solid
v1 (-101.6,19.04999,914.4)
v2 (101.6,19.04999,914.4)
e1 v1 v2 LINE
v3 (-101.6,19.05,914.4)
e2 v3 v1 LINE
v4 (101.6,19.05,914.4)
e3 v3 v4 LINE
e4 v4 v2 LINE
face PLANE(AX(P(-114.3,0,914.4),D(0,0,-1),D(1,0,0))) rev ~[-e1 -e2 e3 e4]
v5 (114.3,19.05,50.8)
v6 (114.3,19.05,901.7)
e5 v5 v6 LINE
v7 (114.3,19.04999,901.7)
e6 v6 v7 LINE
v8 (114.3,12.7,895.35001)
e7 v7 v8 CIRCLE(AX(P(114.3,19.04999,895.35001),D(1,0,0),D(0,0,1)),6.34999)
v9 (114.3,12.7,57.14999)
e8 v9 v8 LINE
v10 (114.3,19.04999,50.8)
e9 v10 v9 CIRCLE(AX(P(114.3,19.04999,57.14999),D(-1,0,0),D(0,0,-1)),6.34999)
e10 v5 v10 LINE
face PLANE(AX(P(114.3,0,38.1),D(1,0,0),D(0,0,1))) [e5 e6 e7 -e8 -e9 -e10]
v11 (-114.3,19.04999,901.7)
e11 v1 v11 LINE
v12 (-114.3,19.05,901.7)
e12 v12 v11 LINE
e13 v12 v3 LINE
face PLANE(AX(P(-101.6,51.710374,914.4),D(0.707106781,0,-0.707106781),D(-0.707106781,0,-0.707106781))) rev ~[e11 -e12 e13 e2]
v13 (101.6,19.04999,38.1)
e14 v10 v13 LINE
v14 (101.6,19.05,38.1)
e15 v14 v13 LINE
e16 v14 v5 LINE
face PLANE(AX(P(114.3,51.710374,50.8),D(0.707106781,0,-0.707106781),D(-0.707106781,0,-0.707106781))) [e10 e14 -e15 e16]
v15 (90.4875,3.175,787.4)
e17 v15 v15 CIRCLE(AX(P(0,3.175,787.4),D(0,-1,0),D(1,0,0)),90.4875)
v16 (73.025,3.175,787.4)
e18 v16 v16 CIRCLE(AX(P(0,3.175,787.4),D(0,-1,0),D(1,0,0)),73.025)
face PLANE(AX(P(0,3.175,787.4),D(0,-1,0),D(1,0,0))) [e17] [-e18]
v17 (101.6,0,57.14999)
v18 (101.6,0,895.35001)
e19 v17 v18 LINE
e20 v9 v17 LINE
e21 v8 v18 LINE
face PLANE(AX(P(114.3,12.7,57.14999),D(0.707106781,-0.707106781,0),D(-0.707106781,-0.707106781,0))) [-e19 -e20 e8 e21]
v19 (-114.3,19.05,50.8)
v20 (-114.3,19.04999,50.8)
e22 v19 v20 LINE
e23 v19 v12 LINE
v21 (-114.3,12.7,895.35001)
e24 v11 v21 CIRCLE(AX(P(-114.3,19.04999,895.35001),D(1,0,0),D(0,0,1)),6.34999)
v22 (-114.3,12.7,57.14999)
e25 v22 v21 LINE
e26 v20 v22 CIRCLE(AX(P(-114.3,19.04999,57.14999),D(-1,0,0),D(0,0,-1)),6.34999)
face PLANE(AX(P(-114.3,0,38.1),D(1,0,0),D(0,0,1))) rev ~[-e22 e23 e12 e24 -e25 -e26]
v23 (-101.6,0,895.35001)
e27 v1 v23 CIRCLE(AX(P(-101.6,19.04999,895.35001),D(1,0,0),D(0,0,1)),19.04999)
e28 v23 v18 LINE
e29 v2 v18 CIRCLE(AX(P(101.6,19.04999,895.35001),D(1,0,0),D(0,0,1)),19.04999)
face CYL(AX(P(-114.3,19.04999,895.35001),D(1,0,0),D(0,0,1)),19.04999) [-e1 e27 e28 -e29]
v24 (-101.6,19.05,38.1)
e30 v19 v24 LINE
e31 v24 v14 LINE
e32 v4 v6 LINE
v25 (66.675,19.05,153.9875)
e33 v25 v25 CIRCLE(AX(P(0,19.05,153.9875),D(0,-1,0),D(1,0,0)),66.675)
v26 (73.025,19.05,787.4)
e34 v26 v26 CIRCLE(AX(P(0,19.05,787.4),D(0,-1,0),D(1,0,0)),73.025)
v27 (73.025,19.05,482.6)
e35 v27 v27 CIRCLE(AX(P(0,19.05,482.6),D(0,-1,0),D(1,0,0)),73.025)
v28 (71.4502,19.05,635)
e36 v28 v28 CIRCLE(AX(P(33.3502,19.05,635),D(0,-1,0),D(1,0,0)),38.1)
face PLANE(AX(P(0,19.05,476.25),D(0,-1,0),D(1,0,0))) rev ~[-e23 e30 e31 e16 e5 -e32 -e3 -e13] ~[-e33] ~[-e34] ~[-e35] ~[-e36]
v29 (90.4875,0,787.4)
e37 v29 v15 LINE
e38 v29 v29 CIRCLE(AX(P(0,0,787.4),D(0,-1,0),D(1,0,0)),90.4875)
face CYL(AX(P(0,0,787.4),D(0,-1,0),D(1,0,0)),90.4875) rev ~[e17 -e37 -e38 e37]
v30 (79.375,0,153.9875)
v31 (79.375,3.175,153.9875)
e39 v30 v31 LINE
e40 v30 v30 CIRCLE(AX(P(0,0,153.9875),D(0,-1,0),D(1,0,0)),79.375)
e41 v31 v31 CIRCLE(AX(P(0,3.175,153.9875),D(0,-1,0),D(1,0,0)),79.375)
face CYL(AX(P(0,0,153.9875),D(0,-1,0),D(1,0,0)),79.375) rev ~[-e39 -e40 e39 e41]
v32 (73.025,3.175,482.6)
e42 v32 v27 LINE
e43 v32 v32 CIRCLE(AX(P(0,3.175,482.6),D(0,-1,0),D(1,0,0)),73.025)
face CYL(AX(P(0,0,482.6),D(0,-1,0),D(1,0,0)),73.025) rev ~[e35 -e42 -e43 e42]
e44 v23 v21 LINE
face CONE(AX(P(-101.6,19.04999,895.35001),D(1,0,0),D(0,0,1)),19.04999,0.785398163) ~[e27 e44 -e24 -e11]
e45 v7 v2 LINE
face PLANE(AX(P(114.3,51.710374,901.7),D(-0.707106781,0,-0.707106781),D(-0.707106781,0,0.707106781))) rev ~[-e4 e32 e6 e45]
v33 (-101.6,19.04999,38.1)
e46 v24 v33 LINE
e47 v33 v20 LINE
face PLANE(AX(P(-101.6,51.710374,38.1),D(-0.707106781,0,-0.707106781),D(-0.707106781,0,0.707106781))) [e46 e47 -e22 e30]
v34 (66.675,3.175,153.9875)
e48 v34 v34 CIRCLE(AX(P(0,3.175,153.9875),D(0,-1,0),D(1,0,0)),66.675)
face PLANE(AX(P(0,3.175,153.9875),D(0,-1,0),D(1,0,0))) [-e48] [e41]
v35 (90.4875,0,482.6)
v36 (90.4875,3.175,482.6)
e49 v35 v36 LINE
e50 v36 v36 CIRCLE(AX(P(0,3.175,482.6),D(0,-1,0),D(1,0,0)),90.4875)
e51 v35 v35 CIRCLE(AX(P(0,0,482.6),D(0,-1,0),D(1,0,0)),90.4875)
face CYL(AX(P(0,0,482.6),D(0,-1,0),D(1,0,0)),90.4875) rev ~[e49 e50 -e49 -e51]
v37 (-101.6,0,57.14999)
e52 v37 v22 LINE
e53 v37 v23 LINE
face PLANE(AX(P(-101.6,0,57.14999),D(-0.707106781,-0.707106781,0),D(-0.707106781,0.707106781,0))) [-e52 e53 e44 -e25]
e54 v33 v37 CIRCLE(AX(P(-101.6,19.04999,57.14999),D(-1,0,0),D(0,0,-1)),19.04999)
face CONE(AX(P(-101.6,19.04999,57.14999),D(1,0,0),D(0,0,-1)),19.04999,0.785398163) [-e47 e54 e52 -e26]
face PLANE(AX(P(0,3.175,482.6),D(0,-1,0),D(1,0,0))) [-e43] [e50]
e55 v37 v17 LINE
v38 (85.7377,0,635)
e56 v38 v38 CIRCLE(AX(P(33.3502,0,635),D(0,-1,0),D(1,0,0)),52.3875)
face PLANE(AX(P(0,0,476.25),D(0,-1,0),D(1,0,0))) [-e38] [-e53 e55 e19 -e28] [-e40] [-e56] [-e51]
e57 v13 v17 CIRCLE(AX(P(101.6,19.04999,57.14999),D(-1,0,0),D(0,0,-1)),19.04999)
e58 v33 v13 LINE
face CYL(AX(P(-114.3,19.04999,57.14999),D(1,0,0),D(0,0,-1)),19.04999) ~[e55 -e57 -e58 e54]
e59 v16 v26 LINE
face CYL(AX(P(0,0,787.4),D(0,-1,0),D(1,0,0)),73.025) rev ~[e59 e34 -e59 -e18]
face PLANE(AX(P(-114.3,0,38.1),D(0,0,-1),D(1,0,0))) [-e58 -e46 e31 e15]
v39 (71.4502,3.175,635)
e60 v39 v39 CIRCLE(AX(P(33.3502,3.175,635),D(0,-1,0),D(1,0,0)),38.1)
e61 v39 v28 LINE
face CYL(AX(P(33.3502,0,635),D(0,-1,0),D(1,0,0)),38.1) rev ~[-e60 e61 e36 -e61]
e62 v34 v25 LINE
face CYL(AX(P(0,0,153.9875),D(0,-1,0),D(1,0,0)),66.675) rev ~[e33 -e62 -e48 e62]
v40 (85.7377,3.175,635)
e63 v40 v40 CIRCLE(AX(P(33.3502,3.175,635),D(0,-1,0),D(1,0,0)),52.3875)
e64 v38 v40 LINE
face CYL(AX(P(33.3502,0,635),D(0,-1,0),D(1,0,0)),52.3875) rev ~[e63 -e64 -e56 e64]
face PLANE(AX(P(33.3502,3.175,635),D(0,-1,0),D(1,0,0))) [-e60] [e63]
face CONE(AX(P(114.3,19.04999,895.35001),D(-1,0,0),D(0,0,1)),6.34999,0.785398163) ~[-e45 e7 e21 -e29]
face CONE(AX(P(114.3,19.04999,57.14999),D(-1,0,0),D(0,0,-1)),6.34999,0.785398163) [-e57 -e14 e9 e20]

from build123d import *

# Parameters (mm, degrees)
F0_W         = 228.6
F0_H         = 876.3
F0_R         = 79.375
F0_R_2       = 90.4875
F0_R_3       = 52.3875
F0_R_4       = 73.025
F0_R_5       = 38.1
F0_R_6       = 66.675
F1_DEPTH     = 19.05
F2_DEPTH     = 3.175
F4_R         = 19.04999
F5_T1_DEPTH  = 838.20002
F5_T3_DEPTH  = 32.6603839472
F5_T6_ANGLE  = 90
F5_T8_ANGLE  = 90
F5_T10_ANGLE = 90
F5_T12_ANGLE = 90


# Not quite as in the source:
# - a fillet or chamfer that OpenCascade refuses, or shapes differently, is made with other operations: its cross-section is extruded or revolved along the edge and cut away or added
# - a fillet or chamfer is up to 0.001 mm smaller than in the source, because OpenCascade refuses the exact size


with BuildPart() as f1:
    # F0 (on Front) → F1 (new body)
    with BuildSketch(Plane.XZ):
        with Locations((0, 476.25)):
            Rectangle(F0_W, F0_H)
        with Locations((0, 153.9875)):
            Circle(F0_R, mode=Mode.SUBTRACT)
        with Locations((0, 482.6)):
            Circle(F0_R_2, mode=Mode.SUBTRACT)
        with Locations((33.3502, 635)):
            Circle(F0_R_3, mode=Mode.SUBTRACT)
        with Locations((0, 787.4)):
            Circle(F0_R_2, mode=Mode.SUBTRACT)
        with Locations((0, 787.4)):
            Circle(F0_R_2)
        with Locations((0, 787.4)):
            Circle(F0_R_4, mode=Mode.SUBTRACT)
        with Locations((33.3502, 635)):
            Circle(F0_R_3)
        with Locations((33.3502, 635)):
            Circle(F0_R_5, mode=Mode.SUBTRACT)
        with Locations((0, 482.6)):
            Circle(F0_R_2)
        with Locations((0, 482.6)):
            Circle(F0_R_4, mode=Mode.SUBTRACT)
        with Locations((0, 153.9875)):
            Circle(F0_R)
        with Locations((0, 153.9875)):
            Circle(F0_R_6, mode=Mode.SUBTRACT)
    extrude(amount=-F1_DEPTH)

    # F0 (on Front) → F2 (cut)
    with BuildSketch(Plane.XZ):
        with Locations((0, 787.4)):
            Circle(F0_R_2)
        with Locations((0, 787.4)):
            Circle(F0_R_4, mode=Mode.SUBTRACT)
        with Locations((33.3502, 635)):
            Circle(F0_R_3)
        with Locations((33.3502, 635)):
            Circle(F0_R_5, mode=Mode.SUBTRACT)
        with Locations((0, 482.6)):
            Circle(F0_R_2)
        with Locations((0, 482.6)):
            Circle(F0_R_4, mode=Mode.SUBTRACT)
        with Locations((0, 153.9875)):
            Circle(F0_R)
        with Locations((0, 153.9875)):
            Circle(F0_R_6, mode=Mode.SUBTRACT)
    extrude(amount=-F2_DEPTH, mode=Mode.SUBTRACT)

    # F4 (radius 19.05 in the source; OpenCascade refuses exactly that, so slightly less here)
    f4_edges = [f1.edges().sort_by_distance(p)[0] for p in [
        (0, 0, 914.4),
        (0, 0, 38.1),
    ]]
    fillet(f4_edges, radius=F4_R)

    # F5: chamfer of 12.7 on 2 edges, made by hand

    # F5_s2 → F5_t1 (cut)
    with BuildSketch(Plane.XY.offset(57.14999)):
        Polygon((-101.6, 0), (-114.3, 12.7), (-114.3, 0), align=None)
        Polygon((114.3, 12.7), (101.6, 0), (114.3, 0), align=None)
    extrude(amount=F5_T1_DEPTH, mode=Mode.SUBTRACT)

    # F5_s4 → F5_t3 (cut)
    with BuildSketch(Plane.XZ.offset(-51.7103739472)):
        Polygon((114.3, 901.7), (101.6, 914.4), (114.3, 914.4), align=None)
        Polygon((114.3, 50.8), (101.6, 38.1), (114.3, 38.1), align=None)
        Polygon((-101.6, 38.1), (-114.3, 50.8), (-114.3, 38.1), align=None)
        Polygon((-101.6, 914.4), (-114.3, 901.7), (-114.3, 914.4), align=None)
    extrude(amount=F5_T3_DEPTH, mode=Mode.SUBTRACT)

    # F5_s5 → F5_t6 (revolve, cut)
    with BuildSketch(Plane.XZ.offset(-19.04999)):
        Polygon((114.3, 50.8), (101.6, 38.1), (114.3, 38.1), align=None)
    revolve(axis=Axis((114.3, 19.04999, 57.14999), (-1, 0, 0)), revolution_arc=F5_T6_ANGLE, mode=Mode.SUBTRACT)

    # F5_s7 → F5_t8 (revolve, cut)
    with BuildSketch(Plane.XZ.offset(-19.04999)):
        Polygon((114.3, 901.7), (101.6, 914.4), (114.3, 914.4), align=None)
    revolve(axis=Axis((114.3, 19.04999, 895.35001), (1, 0, 0)), revolution_arc=F5_T8_ANGLE, mode=Mode.SUBTRACT)

    # F5_s9 → F5_t10 (revolve, cut)
    with BuildSketch(Plane.XZ.offset(-19.04999)):
        Polygon((-101.6, 914.4), (-114.3, 901.7), (-114.3, 914.4), align=None)
    revolve(axis=Axis((-114.3, 19.04999, 895.35001), (1, 0, 0)), revolution_arc=F5_T10_ANGLE, mode=Mode.SUBTRACT)

    # F5_s11 → F5_t12 (revolve, cut)
    with BuildSketch(Plane.XZ.offset(-19.04999)):
        Polygon((-101.6, 38.1), (-114.3, 50.8), (-114.3, 38.1), align=None)
    revolve(axis=Axis((-114.3, 19.04999, 57.14999), (-1, 0, 0)), revolution_arc=F5_T12_ANGLE, mode=Mode.SUBTRACT)


solid = f1.part
